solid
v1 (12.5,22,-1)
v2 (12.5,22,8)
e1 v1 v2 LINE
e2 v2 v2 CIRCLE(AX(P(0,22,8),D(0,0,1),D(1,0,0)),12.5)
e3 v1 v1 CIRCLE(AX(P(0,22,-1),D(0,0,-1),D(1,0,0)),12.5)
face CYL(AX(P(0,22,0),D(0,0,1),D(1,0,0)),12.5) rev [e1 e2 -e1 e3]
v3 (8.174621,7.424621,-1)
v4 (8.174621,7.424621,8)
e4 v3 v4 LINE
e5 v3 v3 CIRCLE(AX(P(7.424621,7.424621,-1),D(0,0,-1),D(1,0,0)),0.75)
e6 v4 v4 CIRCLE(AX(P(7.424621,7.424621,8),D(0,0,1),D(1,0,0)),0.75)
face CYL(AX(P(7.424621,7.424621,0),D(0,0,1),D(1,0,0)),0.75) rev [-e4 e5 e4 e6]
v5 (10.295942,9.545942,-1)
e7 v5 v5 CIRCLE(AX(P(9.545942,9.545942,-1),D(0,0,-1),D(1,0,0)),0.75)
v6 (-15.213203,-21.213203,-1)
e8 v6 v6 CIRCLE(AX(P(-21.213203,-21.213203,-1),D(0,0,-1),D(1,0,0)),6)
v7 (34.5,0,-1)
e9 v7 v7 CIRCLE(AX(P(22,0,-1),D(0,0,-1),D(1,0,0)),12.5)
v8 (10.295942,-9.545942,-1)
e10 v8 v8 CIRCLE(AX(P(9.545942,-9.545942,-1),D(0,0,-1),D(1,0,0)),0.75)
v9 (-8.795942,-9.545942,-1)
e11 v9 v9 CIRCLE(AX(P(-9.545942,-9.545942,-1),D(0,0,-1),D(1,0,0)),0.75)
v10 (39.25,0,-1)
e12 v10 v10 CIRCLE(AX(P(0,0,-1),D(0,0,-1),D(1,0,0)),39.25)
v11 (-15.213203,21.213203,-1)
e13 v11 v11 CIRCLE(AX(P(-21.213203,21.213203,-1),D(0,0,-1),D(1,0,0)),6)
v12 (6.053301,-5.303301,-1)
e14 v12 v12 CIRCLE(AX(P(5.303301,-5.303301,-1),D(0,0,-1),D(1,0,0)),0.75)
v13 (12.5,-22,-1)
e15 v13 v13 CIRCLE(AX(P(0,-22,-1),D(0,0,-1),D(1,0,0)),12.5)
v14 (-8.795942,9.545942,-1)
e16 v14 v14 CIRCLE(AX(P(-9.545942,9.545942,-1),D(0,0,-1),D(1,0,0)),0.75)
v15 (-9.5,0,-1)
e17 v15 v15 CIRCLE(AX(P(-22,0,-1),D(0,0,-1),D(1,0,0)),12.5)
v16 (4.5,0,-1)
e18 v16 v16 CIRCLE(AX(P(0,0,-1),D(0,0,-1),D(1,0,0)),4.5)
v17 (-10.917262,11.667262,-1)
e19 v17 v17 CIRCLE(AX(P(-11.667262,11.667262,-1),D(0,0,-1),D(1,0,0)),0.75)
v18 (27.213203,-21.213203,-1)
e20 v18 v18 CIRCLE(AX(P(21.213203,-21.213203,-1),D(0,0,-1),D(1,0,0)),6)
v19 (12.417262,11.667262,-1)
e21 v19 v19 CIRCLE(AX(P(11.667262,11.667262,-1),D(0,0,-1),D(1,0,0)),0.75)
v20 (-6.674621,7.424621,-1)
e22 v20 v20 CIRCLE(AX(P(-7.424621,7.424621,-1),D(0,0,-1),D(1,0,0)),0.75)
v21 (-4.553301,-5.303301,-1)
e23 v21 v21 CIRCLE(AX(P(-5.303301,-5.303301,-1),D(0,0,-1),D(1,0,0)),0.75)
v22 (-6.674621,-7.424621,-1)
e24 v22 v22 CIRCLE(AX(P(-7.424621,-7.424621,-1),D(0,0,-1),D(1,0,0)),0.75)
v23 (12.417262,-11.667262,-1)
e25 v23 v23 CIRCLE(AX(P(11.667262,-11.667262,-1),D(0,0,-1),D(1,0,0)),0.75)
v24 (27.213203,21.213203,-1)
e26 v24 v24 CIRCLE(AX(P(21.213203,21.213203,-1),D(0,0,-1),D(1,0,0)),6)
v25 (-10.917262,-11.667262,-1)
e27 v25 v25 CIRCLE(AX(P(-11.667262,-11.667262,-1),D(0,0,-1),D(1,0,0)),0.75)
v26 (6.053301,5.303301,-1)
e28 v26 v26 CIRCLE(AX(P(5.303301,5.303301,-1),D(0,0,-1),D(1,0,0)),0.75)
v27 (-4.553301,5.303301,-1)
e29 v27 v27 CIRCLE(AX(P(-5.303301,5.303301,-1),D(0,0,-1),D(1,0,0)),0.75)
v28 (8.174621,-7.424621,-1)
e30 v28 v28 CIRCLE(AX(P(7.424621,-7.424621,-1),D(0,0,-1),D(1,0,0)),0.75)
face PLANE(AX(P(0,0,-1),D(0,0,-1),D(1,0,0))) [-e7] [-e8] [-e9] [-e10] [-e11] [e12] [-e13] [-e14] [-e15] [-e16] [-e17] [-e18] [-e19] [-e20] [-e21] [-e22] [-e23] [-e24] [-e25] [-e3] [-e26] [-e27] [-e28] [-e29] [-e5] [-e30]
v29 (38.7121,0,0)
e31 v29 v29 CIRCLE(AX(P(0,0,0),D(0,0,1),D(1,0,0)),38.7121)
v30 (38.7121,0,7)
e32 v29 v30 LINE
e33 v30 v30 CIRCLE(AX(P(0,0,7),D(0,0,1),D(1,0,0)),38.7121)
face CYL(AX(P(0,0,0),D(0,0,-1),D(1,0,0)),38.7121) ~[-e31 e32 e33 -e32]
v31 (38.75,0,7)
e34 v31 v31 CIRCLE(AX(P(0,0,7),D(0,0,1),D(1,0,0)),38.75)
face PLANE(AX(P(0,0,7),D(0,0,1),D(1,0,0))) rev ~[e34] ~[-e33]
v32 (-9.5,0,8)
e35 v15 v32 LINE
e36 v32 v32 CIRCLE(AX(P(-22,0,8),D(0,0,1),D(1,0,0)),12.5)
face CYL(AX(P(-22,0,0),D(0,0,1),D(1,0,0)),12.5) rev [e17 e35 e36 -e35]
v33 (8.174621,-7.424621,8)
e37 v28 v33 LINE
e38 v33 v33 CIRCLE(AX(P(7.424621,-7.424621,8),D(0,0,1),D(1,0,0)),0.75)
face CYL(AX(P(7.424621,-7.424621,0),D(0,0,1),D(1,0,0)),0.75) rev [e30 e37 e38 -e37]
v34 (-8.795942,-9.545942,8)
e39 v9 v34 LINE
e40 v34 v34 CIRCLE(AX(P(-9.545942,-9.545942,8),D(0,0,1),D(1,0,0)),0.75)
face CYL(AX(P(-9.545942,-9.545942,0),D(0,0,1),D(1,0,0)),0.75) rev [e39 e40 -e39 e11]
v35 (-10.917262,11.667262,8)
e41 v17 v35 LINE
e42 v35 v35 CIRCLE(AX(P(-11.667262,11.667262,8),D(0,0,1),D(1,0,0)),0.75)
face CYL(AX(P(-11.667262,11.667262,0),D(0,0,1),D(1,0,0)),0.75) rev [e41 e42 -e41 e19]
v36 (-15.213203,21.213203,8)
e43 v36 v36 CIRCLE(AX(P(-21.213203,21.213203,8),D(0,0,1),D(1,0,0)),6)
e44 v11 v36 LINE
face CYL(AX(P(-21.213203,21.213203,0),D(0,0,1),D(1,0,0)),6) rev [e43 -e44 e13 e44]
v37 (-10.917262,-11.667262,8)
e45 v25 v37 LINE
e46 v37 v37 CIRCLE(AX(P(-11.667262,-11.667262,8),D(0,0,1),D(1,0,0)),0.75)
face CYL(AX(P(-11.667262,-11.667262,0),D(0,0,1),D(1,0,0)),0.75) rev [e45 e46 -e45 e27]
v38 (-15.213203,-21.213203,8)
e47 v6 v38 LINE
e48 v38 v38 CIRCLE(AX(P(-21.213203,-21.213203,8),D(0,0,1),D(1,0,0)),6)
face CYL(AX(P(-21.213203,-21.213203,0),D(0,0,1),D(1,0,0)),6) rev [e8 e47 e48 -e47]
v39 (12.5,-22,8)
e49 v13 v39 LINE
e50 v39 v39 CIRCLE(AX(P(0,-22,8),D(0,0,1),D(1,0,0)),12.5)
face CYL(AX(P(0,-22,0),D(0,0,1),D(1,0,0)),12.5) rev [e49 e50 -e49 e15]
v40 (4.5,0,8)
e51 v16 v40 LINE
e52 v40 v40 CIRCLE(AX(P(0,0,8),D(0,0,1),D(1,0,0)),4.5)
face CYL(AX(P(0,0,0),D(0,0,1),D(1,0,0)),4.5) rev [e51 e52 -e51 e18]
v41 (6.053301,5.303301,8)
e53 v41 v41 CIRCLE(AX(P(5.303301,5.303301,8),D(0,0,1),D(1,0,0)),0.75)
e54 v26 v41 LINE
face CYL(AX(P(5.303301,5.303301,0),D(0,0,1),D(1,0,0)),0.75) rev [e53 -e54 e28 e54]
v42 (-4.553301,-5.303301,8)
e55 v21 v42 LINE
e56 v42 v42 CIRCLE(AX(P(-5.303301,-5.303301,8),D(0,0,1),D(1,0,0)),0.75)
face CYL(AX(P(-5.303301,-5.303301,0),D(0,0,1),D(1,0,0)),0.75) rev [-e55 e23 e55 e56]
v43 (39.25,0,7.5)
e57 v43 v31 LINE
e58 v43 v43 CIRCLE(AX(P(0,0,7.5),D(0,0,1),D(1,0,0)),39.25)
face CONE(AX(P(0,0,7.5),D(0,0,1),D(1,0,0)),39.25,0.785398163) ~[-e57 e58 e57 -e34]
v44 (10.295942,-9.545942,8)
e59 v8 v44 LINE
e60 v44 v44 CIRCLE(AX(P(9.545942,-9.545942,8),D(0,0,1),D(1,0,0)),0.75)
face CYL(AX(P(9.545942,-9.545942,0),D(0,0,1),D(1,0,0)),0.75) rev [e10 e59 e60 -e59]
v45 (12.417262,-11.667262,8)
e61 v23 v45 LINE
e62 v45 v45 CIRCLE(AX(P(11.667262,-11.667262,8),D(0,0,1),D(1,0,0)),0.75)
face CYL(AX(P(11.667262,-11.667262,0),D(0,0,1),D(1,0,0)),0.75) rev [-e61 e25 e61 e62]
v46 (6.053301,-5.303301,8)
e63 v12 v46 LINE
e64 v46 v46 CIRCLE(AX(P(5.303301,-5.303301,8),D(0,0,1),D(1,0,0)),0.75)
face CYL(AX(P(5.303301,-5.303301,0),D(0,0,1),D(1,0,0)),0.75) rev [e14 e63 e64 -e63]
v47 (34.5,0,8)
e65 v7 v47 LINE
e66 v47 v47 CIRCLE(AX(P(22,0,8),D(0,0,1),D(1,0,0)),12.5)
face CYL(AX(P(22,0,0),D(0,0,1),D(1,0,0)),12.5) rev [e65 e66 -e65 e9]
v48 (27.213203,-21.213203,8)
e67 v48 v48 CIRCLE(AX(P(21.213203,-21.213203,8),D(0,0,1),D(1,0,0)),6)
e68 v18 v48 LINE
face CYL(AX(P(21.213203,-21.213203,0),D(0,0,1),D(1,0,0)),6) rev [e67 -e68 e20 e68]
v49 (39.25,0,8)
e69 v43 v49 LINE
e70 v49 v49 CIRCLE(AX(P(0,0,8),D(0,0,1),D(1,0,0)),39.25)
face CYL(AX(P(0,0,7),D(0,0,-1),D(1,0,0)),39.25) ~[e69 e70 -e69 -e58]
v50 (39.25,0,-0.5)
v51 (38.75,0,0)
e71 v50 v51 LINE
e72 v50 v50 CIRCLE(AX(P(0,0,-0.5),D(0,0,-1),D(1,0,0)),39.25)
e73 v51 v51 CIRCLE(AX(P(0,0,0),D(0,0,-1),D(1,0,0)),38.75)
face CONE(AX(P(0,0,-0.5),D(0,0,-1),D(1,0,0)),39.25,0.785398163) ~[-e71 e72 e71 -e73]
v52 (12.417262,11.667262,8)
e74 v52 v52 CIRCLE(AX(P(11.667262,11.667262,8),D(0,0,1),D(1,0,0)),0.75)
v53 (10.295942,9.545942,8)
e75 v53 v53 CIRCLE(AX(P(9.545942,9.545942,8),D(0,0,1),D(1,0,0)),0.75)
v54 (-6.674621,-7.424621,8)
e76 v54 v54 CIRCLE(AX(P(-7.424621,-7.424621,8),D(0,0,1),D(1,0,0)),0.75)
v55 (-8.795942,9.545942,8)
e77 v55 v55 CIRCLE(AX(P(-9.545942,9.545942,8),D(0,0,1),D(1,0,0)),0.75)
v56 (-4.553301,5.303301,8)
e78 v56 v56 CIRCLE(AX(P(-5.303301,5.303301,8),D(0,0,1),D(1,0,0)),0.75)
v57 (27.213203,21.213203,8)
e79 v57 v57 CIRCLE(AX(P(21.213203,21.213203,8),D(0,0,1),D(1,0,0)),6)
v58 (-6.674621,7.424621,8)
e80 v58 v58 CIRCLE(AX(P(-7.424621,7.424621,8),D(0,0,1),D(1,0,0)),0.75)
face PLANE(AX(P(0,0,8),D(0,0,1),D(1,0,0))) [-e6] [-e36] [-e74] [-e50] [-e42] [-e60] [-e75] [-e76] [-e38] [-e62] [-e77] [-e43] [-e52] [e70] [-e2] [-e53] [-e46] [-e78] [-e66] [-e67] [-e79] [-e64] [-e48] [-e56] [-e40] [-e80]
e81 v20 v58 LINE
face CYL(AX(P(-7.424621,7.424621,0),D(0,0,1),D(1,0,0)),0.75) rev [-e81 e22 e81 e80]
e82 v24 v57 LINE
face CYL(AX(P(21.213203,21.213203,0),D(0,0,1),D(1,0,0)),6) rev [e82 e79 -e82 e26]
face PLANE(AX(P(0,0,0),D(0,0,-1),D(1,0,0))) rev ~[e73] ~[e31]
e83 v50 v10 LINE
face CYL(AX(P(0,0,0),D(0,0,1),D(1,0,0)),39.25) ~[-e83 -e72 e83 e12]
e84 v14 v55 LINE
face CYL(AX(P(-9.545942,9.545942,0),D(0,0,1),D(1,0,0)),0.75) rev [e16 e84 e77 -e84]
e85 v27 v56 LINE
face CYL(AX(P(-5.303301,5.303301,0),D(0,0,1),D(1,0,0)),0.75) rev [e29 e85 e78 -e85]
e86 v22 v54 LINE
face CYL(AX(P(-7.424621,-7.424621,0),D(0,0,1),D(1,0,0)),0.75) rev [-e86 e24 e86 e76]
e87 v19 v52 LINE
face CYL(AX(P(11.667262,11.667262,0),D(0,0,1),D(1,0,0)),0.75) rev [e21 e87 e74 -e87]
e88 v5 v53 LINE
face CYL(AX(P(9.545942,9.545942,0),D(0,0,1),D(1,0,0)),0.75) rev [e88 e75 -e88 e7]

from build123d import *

# Parameters (mm, degrees)
F0_R     = 38.7121
F0_R_2   = 6
F0_R_3   = 0.75
F0_R_4   = 12.5
F0_R_5   = 4.5
F1_DEPTH = 7
F2_R     = 39.25
F2_R_2   = 38.7121
F2_R_3   = 6
F2_R_4   = 0.75
F2_R_5   = 12.5
F2_R_6   = 4.5
F3_DEPTH = 1
F4_R     = 39.25
F4_R_2   = 38.7121
F4_R_3   = 6
F4_R_4   = 0.75
F4_R_5   = 12.5
F4_R_6   = 4.5
F5_DEPTH = 1
F6_SIZE  = 0.5


with BuildPart() as f1:
    # F0 (on Top) → F1 (new body)
    with BuildSketch(Plane.XY):
        Circle(F0_R)
        with Locations((-21.2132034356, -21.2132034356)):
            Circle(F0_R_2, mode=Mode.SUBTRACT)
        with Locations((-11.6672618896, -11.6672618896)):
            Circle(F0_R_3, mode=Mode.SUBTRACT)
        with Locations((-9.545941546, -9.545941546)):
            Circle(F0_R_3, mode=Mode.SUBTRACT)
        with Locations((-7.4246212025, -7.4246212025)):
            Circle(F0_R_3, mode=Mode.SUBTRACT)
        with Locations((-5.3033008589, -5.3033008589)):
            Circle(F0_R_3, mode=Mode.SUBTRACT)
        with Locations((0, -22)):
            Circle(F0_R_4, mode=Mode.SUBTRACT)
        with Locations((21.2132034356, -21.2132034356)):
            Circle(F0_R_2, mode=Mode.SUBTRACT)
        with Locations((11.6672618896, -11.6672618896)):
            Circle(F0_R_3, mode=Mode.SUBTRACT)
        with Locations((9.545941546, -9.545941546)):
            Circle(F0_R_3, mode=Mode.SUBTRACT)
        with Locations((7.4246212025, -7.4246212025)):
            Circle(F0_R_3, mode=Mode.SUBTRACT)
        with Locations((5.3033008589, -5.3033008589)):
            Circle(F0_R_3, mode=Mode.SUBTRACT)
        with Locations((-22, 0)):
            Circle(F0_R_4, mode=Mode.SUBTRACT)
        with Locations((-5.3033008589, 5.3033008589)):
            Circle(F0_R_3, mode=Mode.SUBTRACT)
        with Locations((-7.4246212025, 7.4246212025)):
            Circle(F0_R_3, mode=Mode.SUBTRACT)
        with Locations((-9.545941546, 9.545941546)):
            Circle(F0_R_3, mode=Mode.SUBTRACT)
        with Locations((-11.6672618896, 11.6672618896)):
            Circle(F0_R_3, mode=Mode.SUBTRACT)
        with Locations((-21.2132034356, 21.2132034356)):
            Circle(F0_R_2, mode=Mode.SUBTRACT)
        Circle(F0_R_5, mode=Mode.SUBTRACT)
        with Locations((5.3033008589, 5.3033008589)):
            Circle(F0_R_3, mode=Mode.SUBTRACT)
        with Locations((7.4246212025, 7.4246212025)):
            Circle(F0_R_3, mode=Mode.SUBTRACT)
        with Locations((9.545941546, 9.545941546)):
            Circle(F0_R_3, mode=Mode.SUBTRACT)
        with Locations((11.6672618896, 11.6672618896)):
            Circle(F0_R_3, mode=Mode.SUBTRACT)
        with Locations((22, 0)):
            Circle(F0_R_4, mode=Mode.SUBTRACT)
        with Locations((0, 22)):
            Circle(F0_R_4, mode=Mode.SUBTRACT)
        with Locations((21.2132034356, 21.2132034356)):
            Circle(F0_R_2, mode=Mode.SUBTRACT)
    extrude(amount=F1_DEPTH)

    # F2 (on face) → F3 (join)
    with BuildSketch(Plane.XY.offset(7)):
        Circle(F2_R)
        Circle(F2_R_2, mode=Mode.SUBTRACT)
        Circle(F2_R_2)
        with Locations((-21.2132034356, -21.2132034356)):
            Circle(F2_R_3, mode=Mode.SUBTRACT)
        with Locations((-11.6672618896, -11.6672618896)):
            Circle(F2_R_4, mode=Mode.SUBTRACT)
        with Locations((-9.545941546, -9.545941546)):
            Circle(F2_R_4, mode=Mode.SUBTRACT)
        with Locations((-7.4246212025, -7.4246212025)):
            Circle(F2_R_4, mode=Mode.SUBTRACT)
        with Locations((-5.3033008589, -5.3033008589)):
            Circle(F2_R_4, mode=Mode.SUBTRACT)
        with Locations((0, -22)):
            Circle(F2_R_5, mode=Mode.SUBTRACT)
        with Locations((21.2132034356, -21.2132034356)):
            Circle(F2_R_3, mode=Mode.SUBTRACT)
        with Locations((11.6672618896, -11.6672618896)):
            Circle(F2_R_4, mode=Mode.SUBTRACT)
        with Locations((9.545941546, -9.545941546)):
            Circle(F2_R_4, mode=Mode.SUBTRACT)
        with Locations((7.4246212025, -7.4246212025)):
            Circle(F2_R_4, mode=Mode.SUBTRACT)
        with Locations((5.3033008589, -5.3033008589)):
            Circle(F2_R_4, mode=Mode.SUBTRACT)
        with Locations((-22, 0)):
            Circle(F2_R_5, mode=Mode.SUBTRACT)
        with Locations((-5.3033008589, 5.3033008589)):
            Circle(F2_R_4, mode=Mode.SUBTRACT)
        with Locations((-7.4246212025, 7.4246212025)):
            Circle(F2_R_4, mode=Mode.SUBTRACT)
        with Locations((-9.545941546, 9.545941546)):
            Circle(F2_R_4, mode=Mode.SUBTRACT)
        with Locations((-11.6672618896, 11.6672618896)):
            Circle(F2_R_4, mode=Mode.SUBTRACT)
        with Locations((-21.2132034356, 21.2132034356)):
            Circle(F2_R_3, mode=Mode.SUBTRACT)
        Circle(F2_R_6, mode=Mode.SUBTRACT)
        with Locations((5.3033008589, 5.3033008589)):
            Circle(F2_R_4, mode=Mode.SUBTRACT)
        with Locations((7.4246212025, 7.4246212025)):
            Circle(F2_R_4, mode=Mode.SUBTRACT)
        with Locations((9.545941546, 9.545941546)):
            Circle(F2_R_4, mode=Mode.SUBTRACT)
        with Locations((11.6672618896, 11.6672618896)):
            Circle(F2_R_4, mode=Mode.SUBTRACT)
        with Locations((22, 0)):
            Circle(F2_R_5, mode=Mode.SUBTRACT)
        with Locations((0, 22)):
            Circle(F2_R_5, mode=Mode.SUBTRACT)
        with Locations((21.2132034356, 21.2132034356)):
            Circle(F2_R_3, mode=Mode.SUBTRACT)
    extrude(amount=F3_DEPTH)

    # F4 (on face) → F5 (join)
    with BuildSketch(Plane(origin=(0, 0, 0), x_dir=(1, 0, 0), z_dir=(0, 0, -1))):
        Circle(F4_R)
        Circle(F4_R_2, mode=Mode.SUBTRACT)
        Circle(F4_R_2)
        with Locations((-21.2132034356, -21.2132034356)):
            Circle(F4_R_3, mode=Mode.SUBTRACT)
        with Locations((-11.6672618896, -11.6672618896)):
            Circle(F4_R_4, mode=Mode.SUBTRACT)
        with Locations((-9.545941546, -9.545941546)):
            Circle(F4_R_4, mode=Mode.SUBTRACT)
        with Locations((-7.4246212025, -7.4246212025)):
            Circle(F4_R_4, mode=Mode.SUBTRACT)
        with Locations((-5.3033008589, -5.3033008589)):
            Circle(F4_R_4, mode=Mode.SUBTRACT)
        with Locations((0, -22)):
            Circle(F4_R_5, mode=Mode.SUBTRACT)
        with Locations((21.2132034356, -21.2132034356)):
            Circle(F4_R_3, mode=Mode.SUBTRACT)
        with Locations((11.6672618896, -11.6672618896)):
            Circle(F4_R_4, mode=Mode.SUBTRACT)
        with Locations((9.545941546, -9.545941546)):
            Circle(F4_R_4, mode=Mode.SUBTRACT)
        with Locations((7.4246212025, -7.4246212025)):
            Circle(F4_R_4, mode=Mode.SUBTRACT)
        with Locations((5.3033008589, -5.3033008589)):
            Circle(F4_R_4, mode=Mode.SUBTRACT)
        with Locations((-22, 0)):
            Circle(F4_R_5, mode=Mode.SUBTRACT)
        with Locations((-5.3033008589, 5.3033008589)):
            Circle(F4_R_4, mode=Mode.SUBTRACT)
        with Locations((-7.4246212025, 7.4246212025)):
            Circle(F4_R_4, mode=Mode.SUBTRACT)
        with Locations((-9.545941546, 9.545941546)):
            Circle(F4_R_4, mode=Mode.SUBTRACT)
        with Locations((-11.6672618896, 11.6672618896)):
            Circle(F4_R_4, mode=Mode.SUBTRACT)
        with Locations((-21.2132034356, 21.2132034356)):
            Circle(F4_R_3, mode=Mode.SUBTRACT)
        Circle(F4_R_6, mode=Mode.SUBTRACT)
        with Locations((5.3033008589, 5.3033008589)):
            Circle(F4_R_4, mode=Mode.SUBTRACT)
        with Locations((7.4246212025, 7.4246212025)):
            Circle(F4_R_4, mode=Mode.SUBTRACT)
        with Locations((9.545941546, 9.545941546)):
            Circle(F4_R_4, mode=Mode.SUBTRACT)
        with Locations((11.6672618896, 11.6672618896)):
            Circle(F4_R_4, mode=Mode.SUBTRACT)
        with Locations((22, 0)):
            Circle(F4_R_5, mode=Mode.SUBTRACT)
        with Locations((0, 22)):
            Circle(F4_R_5, mode=Mode.SUBTRACT)
        with Locations((21.2132034356, 21.2132034356)):
            Circle(F4_R_3, mode=Mode.SUBTRACT)
    extrude(amount=F5_DEPTH)

    # F6
    f6_edges = [f1.edges().sort_by_distance(p)[0] for p in [
        (-39.25, 0, 0),
        (-39.25, 0, 7),
    ]]
    chamfer(f6_edges, length=F6_SIZE)


solid = f1.part
